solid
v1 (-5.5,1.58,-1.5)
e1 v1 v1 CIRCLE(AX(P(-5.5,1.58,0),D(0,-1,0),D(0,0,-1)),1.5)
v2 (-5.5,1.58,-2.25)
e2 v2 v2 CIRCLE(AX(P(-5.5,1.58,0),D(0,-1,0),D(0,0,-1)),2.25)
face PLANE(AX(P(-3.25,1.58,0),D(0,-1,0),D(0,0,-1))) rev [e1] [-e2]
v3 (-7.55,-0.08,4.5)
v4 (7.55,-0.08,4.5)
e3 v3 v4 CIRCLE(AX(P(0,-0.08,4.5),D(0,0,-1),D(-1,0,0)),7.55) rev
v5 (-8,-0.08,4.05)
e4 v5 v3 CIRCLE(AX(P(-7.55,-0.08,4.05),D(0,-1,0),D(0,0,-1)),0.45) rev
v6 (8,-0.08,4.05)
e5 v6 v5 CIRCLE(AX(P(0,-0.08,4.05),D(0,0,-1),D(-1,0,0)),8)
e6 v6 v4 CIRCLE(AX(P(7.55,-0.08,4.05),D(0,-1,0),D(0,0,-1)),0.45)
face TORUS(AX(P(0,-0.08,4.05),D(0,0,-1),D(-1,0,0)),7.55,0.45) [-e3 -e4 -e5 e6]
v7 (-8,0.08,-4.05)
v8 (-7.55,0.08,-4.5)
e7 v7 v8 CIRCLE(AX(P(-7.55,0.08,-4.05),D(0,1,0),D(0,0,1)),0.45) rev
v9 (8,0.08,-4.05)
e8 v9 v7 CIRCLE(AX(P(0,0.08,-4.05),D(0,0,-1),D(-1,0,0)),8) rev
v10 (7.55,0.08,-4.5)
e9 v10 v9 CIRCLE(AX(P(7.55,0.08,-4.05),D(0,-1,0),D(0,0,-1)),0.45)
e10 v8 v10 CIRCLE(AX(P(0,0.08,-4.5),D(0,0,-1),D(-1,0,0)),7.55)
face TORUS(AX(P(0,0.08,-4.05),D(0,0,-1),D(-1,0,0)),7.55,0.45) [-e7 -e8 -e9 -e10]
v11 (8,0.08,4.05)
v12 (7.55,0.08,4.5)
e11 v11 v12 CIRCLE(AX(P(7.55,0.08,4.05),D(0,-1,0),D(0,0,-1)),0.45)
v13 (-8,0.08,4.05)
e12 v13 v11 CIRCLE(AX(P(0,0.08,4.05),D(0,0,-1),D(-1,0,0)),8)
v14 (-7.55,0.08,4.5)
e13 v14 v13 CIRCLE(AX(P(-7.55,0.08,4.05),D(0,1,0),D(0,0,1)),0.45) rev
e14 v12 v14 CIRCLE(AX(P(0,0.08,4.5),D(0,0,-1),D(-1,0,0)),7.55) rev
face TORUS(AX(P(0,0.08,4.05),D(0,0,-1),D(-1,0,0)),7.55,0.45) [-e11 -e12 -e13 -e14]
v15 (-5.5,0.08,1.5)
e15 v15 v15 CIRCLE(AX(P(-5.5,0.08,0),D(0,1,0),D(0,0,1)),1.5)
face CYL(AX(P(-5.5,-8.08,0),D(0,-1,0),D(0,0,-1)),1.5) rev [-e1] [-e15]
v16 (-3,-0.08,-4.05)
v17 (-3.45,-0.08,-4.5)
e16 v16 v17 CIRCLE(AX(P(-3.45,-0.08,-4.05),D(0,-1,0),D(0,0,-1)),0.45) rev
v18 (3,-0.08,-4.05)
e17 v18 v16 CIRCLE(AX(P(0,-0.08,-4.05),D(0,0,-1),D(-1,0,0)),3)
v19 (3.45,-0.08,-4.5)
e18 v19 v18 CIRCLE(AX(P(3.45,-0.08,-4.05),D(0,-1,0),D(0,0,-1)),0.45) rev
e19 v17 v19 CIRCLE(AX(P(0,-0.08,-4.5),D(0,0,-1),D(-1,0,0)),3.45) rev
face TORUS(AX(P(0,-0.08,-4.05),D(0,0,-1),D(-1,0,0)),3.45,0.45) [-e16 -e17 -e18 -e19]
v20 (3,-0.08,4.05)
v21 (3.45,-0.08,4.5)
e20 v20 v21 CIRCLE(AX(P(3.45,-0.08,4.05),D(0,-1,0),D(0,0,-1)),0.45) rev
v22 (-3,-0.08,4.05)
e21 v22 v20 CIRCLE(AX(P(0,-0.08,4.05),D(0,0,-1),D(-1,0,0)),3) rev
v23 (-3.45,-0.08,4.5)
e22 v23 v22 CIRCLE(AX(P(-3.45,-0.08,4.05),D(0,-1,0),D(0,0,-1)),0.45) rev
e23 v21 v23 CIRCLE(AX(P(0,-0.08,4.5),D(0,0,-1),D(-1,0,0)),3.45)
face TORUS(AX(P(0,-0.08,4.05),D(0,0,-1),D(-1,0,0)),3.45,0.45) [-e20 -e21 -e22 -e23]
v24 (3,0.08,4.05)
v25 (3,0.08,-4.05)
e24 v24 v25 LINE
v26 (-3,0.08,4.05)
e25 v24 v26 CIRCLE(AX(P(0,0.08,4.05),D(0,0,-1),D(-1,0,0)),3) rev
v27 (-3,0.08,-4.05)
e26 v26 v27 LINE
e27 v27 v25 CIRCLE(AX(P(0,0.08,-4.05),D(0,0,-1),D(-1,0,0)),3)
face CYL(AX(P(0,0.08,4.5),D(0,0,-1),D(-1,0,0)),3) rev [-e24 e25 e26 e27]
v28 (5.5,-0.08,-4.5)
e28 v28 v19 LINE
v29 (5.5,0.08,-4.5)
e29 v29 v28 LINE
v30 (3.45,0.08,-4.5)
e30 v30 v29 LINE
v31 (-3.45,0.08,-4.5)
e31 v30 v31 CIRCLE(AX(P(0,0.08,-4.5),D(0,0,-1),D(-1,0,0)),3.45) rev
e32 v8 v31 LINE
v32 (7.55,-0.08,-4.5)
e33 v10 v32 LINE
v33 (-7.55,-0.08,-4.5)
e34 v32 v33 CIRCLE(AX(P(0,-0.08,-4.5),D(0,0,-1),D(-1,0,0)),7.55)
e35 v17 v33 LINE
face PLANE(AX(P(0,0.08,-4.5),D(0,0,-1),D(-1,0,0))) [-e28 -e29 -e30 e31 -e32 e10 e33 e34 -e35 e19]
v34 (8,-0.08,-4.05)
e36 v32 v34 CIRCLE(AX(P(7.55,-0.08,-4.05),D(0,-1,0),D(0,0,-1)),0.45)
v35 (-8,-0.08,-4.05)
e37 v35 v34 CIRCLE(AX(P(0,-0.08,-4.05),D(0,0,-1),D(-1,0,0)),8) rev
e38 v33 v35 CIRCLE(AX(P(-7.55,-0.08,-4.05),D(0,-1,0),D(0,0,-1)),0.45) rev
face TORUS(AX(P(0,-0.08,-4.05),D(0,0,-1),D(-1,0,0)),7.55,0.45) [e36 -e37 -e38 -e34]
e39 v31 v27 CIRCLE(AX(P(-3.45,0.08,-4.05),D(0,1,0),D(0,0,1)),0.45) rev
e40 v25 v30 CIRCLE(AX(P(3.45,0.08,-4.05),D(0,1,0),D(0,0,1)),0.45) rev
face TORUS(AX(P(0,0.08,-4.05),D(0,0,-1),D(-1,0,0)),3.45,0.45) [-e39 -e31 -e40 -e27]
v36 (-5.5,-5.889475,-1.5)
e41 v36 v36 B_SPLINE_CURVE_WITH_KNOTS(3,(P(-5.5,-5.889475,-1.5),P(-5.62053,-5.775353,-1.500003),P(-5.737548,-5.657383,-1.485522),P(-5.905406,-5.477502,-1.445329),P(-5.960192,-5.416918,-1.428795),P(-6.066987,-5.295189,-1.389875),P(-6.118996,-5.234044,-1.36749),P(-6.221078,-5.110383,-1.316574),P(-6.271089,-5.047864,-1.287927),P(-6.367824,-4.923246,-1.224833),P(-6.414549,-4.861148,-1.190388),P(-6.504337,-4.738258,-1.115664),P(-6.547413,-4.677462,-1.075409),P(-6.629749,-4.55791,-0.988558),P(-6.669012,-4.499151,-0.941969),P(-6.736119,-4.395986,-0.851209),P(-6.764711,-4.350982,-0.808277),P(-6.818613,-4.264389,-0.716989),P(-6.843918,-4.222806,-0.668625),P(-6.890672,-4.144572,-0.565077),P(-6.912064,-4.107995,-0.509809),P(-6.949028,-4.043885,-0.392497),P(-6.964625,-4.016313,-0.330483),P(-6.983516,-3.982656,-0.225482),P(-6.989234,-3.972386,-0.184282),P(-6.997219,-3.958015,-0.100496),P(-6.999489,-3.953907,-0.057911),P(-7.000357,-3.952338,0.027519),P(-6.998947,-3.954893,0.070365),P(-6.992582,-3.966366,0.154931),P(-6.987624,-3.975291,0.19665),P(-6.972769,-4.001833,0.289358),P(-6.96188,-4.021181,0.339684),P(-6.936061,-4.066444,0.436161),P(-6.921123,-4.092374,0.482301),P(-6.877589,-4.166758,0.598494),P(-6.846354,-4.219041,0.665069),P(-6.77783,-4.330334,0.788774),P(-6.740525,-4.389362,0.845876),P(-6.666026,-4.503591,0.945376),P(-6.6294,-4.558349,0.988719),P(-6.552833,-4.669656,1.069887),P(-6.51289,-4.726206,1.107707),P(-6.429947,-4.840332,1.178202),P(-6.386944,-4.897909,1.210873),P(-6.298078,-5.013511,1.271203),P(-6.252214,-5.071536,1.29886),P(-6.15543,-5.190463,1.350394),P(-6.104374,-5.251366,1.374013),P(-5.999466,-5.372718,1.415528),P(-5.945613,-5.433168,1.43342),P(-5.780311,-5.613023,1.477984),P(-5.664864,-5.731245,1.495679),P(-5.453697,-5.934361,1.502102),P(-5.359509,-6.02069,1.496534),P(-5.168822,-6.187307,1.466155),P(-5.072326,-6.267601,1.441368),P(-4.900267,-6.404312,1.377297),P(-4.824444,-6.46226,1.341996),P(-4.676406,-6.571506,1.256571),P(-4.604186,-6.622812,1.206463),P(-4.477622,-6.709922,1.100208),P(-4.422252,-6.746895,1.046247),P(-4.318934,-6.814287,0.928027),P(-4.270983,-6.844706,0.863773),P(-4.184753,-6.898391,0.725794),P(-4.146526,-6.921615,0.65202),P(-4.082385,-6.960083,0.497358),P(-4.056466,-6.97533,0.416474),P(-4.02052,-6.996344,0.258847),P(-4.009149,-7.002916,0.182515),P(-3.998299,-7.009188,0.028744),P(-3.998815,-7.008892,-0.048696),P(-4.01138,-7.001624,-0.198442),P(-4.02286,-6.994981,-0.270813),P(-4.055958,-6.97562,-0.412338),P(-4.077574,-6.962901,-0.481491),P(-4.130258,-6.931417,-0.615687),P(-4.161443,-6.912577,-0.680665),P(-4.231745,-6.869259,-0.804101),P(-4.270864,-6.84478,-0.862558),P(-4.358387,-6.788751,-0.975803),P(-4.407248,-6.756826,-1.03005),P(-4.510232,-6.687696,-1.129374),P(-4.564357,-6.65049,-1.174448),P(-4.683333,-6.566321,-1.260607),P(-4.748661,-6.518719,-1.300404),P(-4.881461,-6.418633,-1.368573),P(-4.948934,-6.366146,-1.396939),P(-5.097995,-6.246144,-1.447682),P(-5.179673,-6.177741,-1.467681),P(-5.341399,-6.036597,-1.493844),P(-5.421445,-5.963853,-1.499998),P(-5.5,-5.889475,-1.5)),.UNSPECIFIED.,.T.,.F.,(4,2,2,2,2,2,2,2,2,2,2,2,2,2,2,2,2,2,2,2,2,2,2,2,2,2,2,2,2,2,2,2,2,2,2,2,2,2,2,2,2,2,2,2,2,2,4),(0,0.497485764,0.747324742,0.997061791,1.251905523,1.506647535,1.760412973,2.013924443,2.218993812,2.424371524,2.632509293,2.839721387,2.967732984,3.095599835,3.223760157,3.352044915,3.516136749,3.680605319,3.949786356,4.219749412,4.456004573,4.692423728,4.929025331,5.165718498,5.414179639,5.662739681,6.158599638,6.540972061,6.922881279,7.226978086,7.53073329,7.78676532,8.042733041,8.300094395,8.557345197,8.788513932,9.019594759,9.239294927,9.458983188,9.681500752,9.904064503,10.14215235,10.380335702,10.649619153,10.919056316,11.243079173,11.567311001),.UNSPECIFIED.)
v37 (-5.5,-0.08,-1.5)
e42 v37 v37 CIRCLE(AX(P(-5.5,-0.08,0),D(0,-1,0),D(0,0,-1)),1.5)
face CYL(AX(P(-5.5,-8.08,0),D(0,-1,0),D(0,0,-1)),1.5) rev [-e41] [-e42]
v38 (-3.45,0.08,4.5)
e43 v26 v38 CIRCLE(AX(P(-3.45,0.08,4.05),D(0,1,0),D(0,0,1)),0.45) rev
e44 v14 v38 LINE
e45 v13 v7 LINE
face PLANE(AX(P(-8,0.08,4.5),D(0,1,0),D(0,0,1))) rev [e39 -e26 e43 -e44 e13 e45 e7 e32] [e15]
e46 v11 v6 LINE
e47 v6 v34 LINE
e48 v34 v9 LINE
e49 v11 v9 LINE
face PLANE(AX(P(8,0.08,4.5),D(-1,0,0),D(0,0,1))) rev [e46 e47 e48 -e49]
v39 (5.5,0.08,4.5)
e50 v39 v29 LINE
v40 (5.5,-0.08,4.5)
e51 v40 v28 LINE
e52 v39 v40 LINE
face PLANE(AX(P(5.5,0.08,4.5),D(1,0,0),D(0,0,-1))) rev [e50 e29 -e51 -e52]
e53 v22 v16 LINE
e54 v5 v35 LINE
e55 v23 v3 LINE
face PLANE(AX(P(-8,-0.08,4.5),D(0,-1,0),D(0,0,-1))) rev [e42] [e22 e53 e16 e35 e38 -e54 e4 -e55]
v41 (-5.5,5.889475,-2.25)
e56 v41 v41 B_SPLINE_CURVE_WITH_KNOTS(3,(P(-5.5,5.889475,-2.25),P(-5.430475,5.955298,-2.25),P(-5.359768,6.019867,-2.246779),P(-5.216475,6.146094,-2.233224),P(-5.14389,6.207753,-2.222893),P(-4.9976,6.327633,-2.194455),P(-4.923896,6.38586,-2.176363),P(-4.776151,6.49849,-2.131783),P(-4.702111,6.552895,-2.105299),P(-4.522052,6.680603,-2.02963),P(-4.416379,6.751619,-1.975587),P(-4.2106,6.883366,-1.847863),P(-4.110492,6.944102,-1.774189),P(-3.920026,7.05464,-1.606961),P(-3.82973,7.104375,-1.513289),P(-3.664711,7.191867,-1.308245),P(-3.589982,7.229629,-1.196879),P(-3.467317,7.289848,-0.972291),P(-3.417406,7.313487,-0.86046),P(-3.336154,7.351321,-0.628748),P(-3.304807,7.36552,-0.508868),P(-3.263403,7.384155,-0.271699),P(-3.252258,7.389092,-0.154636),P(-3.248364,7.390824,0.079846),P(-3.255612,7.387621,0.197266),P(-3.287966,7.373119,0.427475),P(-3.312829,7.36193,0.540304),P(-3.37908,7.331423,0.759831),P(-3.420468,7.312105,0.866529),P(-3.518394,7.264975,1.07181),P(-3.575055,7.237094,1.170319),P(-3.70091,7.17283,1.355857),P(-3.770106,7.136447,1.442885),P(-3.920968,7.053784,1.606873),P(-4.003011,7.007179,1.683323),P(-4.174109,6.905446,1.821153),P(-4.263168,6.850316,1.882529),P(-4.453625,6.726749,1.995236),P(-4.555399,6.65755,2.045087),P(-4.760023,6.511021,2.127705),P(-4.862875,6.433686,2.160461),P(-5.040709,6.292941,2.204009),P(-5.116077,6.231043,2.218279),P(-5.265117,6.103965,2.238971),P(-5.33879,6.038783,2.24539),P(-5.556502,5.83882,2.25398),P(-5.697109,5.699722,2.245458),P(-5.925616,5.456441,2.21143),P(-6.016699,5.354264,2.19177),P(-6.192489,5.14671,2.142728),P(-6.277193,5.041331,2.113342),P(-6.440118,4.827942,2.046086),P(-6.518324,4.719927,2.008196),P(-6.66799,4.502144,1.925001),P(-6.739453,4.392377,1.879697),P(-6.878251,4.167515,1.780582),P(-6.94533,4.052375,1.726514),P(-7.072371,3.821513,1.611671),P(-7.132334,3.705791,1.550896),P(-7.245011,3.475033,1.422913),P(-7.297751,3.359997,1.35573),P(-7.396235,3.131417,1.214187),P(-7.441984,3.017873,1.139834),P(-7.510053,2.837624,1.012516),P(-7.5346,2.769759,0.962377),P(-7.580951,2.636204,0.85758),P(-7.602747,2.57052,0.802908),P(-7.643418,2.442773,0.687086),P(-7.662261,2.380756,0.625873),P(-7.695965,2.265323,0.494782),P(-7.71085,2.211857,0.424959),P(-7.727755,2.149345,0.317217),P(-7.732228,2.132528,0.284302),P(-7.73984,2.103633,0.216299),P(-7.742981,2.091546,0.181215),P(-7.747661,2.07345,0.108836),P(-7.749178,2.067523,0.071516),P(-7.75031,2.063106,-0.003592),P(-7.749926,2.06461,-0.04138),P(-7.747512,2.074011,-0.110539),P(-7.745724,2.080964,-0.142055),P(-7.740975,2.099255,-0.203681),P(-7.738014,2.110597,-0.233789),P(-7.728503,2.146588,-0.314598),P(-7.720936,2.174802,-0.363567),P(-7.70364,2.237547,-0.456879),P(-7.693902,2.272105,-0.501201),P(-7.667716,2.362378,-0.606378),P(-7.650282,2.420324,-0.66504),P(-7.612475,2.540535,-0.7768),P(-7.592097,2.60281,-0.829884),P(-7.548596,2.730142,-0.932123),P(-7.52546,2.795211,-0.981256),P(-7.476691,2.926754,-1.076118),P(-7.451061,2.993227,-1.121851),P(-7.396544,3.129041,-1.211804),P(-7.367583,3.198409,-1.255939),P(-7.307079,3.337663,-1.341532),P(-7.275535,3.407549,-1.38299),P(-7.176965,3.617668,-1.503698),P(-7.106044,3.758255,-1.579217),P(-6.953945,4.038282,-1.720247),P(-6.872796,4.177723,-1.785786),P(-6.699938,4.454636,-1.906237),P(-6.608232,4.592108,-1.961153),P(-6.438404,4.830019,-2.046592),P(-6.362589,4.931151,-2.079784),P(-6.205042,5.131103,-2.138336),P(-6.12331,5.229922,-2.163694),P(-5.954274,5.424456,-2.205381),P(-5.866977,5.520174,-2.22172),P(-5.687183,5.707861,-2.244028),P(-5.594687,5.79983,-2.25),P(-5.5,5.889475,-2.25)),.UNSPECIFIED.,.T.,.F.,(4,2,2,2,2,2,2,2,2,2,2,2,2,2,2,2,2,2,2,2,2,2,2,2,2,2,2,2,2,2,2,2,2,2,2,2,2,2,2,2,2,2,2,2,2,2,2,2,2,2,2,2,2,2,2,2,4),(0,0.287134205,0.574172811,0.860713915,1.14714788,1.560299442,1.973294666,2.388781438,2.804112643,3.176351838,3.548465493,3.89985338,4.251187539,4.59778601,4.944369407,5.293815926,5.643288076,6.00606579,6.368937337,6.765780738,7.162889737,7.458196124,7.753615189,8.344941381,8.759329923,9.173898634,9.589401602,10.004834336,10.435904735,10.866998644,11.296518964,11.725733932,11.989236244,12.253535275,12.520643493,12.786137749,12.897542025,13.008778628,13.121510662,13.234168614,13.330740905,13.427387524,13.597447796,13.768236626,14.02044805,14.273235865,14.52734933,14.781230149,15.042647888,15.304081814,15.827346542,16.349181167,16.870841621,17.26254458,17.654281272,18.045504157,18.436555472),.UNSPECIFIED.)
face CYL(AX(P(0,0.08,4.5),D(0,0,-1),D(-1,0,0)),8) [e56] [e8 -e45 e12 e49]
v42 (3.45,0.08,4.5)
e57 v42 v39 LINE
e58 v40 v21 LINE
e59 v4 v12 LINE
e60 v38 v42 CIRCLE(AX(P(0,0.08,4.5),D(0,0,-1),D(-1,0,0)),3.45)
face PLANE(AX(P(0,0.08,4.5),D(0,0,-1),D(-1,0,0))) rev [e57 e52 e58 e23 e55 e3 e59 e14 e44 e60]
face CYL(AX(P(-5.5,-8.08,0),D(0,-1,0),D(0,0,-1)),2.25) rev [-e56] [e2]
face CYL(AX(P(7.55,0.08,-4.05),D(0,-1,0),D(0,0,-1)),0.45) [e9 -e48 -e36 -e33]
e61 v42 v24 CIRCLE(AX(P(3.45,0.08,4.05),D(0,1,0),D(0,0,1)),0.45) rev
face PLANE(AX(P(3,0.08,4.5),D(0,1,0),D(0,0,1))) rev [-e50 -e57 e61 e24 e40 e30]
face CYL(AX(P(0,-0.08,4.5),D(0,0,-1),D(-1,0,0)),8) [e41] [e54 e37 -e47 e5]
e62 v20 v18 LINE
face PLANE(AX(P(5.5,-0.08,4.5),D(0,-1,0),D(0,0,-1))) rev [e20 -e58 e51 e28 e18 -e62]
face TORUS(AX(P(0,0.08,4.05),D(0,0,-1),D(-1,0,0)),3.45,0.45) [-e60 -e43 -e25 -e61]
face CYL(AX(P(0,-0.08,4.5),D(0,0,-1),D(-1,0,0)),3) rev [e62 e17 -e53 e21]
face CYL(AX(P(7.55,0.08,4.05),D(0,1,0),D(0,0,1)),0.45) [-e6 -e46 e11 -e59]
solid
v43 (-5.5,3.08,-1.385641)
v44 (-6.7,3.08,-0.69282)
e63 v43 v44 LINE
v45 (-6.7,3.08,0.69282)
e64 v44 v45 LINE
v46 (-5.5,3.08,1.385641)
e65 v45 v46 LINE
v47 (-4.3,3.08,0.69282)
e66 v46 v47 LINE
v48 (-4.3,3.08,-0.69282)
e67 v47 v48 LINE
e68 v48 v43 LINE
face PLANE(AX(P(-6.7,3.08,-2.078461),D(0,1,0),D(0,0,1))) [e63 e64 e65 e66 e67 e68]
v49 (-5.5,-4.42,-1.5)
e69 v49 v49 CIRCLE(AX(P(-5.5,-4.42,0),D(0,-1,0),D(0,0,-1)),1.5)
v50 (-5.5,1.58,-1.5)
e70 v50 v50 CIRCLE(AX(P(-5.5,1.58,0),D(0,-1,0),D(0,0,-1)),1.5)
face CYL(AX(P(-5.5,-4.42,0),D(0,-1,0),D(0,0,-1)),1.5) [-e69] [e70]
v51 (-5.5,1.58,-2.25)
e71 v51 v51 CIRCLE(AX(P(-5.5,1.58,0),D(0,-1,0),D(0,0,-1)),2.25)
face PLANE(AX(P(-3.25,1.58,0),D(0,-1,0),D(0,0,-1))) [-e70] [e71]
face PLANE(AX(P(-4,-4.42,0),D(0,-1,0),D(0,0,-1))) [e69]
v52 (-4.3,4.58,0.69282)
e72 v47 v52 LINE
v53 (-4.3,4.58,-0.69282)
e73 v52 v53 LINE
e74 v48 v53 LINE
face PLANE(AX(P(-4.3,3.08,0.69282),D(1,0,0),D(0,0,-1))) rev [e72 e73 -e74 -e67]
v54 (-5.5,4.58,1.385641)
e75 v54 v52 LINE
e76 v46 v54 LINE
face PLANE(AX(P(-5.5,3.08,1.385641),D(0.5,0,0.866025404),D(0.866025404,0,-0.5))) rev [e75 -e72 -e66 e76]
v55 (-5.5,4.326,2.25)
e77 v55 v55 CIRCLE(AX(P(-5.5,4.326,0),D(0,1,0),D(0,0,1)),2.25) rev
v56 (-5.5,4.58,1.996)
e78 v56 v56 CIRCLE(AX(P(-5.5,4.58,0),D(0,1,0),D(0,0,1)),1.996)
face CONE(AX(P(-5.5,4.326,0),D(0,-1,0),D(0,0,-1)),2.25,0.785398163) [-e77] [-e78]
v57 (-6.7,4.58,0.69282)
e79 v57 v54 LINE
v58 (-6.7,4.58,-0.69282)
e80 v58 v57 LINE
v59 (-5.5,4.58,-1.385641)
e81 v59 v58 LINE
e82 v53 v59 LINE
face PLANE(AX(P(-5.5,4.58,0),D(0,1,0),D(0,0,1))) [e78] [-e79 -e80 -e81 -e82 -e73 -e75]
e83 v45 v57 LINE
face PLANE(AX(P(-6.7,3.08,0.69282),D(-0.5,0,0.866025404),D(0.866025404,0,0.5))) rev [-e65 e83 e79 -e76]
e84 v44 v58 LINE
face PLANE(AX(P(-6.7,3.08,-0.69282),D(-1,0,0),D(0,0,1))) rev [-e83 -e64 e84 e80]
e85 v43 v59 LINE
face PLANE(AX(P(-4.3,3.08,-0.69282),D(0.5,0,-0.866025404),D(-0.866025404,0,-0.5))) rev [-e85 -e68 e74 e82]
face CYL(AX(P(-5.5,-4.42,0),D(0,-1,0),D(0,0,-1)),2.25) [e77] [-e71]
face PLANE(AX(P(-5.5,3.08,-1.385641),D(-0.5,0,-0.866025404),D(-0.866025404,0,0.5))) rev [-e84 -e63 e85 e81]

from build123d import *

# Parameters (mm, degrees)
EXTRUDE1_DEPTH     = 4.5
CUT_EXTRUDE2_DEPTH = 1.5
FILLET1_R          = 0.45
FILLET2_R          = 0.45
CHAMFER2_SIZE      = 0.254


with BuildPart() as part:
    # Sketch1 → Extrude1 (new, symmetric)
    with BuildSketch(Plane.XY):
        with BuildLine():
            Line((-8, 0.08), (-3, 0.08))
            ThreePointArc((-3, 0.08), (0, 3.08), (3, 0.08))
            Line((3, 0.08), (5.5, 0.08))
            Line((5.5, 0.08), (5.5, -0.08))
            Line((5.5, -0.08), (3, -0.08))
            ThreePointArc((3, -0.08), (0, -3.08), (-3, -0.08))
            Line((-3, -0.08), (-8, -0.08))
            ThreePointArc((-8, -0.08), (0, -8.08), (8, -0.08))
            Line((8, -0.08), (8, 0.08))
            ThreePointArc((8, 0.08), (0, 8.08), (-8, 0.08))
        make_face()
    extrude(amount=EXTRUDE1_DEPTH, both=True)

    # Sketch4 → Cut-Revolve1 (revolve, cut)
    with BuildSketch(Plane.XY):
        Polygon((-5.5, 8.08), (-3.25, 8.08), (-3.25, 1.58), (-4, 1.58), (-4, -8.08), (-5.5, -8.08), align=None)
    revolve(axis=Axis((-5.5, -8.08, 0), (0, 1, 0)), mode=Mode.SUBTRACT)

    # Fillet1
    fillet1_edges = [part.edges().sort_by_distance(p)[0] for p in [
        (0, 3.08, -4.5),
        (0, 3.08, 4.5),
        (0, 8.08, -4.5),
        (0, 8.08, 4.5),
        (0, -8.08, -4.5),
        (0, -8.08, 4.5),
        (8, 0, -4.5),
        (8, 0, 4.5),
    ]]
    fillet(fillet1_edges, radius=FILLET1_R)

    # Fillet2
    fillet2_edges = [part.edges().sort_by_distance(p)[0] for p in [
        (0, -3.08, -4.5),
        (0, -3.08, 4.5),
    ]]
    fillet(fillet2_edges, radius=FILLET2_R)


with BuildPart() as body_2:
    # Sketch6 → Revolve1 (revolve)
    with BuildSketch(Plane.XY):
        Polygon((-5.5, 4.58), (-3.25, 4.58), (-3.25, 1.58), (-4, 1.58), (-4, -4.42), (-5.5, -4.42), align=None)
    revolve(axis=Axis((-5.5, -4.42, 0), (0, 1, 0)))

    # Sketch7 → Cut-Extrude2 (cut)
    with BuildSketch(Plane(origin=(0, 4.58, 0), x_dir=(-1, 0, 0), z_dir=(0, 1, 0))):
        Polygon((5.5, -1.385640646), (6.7, -0.692820323), (6.7, 0.692820323), (5.5, 1.385640646), (4.3, 0.692820323), (4.3, -0.692820323), align=None)
    extrude(amount=-CUT_EXTRUDE2_DEPTH, mode=Mode.SUBTRACT)

    # Chamfer2
    chamfer2_edges = [body_2.edges().sort_by_distance(p)[0] for p in [
        (-7.75, 4.58, 0),
    ]]
    chamfer(chamfer2_edges, length=CHAMFER2_SIZE)


solid = Compound([part.part, body_2.part])
